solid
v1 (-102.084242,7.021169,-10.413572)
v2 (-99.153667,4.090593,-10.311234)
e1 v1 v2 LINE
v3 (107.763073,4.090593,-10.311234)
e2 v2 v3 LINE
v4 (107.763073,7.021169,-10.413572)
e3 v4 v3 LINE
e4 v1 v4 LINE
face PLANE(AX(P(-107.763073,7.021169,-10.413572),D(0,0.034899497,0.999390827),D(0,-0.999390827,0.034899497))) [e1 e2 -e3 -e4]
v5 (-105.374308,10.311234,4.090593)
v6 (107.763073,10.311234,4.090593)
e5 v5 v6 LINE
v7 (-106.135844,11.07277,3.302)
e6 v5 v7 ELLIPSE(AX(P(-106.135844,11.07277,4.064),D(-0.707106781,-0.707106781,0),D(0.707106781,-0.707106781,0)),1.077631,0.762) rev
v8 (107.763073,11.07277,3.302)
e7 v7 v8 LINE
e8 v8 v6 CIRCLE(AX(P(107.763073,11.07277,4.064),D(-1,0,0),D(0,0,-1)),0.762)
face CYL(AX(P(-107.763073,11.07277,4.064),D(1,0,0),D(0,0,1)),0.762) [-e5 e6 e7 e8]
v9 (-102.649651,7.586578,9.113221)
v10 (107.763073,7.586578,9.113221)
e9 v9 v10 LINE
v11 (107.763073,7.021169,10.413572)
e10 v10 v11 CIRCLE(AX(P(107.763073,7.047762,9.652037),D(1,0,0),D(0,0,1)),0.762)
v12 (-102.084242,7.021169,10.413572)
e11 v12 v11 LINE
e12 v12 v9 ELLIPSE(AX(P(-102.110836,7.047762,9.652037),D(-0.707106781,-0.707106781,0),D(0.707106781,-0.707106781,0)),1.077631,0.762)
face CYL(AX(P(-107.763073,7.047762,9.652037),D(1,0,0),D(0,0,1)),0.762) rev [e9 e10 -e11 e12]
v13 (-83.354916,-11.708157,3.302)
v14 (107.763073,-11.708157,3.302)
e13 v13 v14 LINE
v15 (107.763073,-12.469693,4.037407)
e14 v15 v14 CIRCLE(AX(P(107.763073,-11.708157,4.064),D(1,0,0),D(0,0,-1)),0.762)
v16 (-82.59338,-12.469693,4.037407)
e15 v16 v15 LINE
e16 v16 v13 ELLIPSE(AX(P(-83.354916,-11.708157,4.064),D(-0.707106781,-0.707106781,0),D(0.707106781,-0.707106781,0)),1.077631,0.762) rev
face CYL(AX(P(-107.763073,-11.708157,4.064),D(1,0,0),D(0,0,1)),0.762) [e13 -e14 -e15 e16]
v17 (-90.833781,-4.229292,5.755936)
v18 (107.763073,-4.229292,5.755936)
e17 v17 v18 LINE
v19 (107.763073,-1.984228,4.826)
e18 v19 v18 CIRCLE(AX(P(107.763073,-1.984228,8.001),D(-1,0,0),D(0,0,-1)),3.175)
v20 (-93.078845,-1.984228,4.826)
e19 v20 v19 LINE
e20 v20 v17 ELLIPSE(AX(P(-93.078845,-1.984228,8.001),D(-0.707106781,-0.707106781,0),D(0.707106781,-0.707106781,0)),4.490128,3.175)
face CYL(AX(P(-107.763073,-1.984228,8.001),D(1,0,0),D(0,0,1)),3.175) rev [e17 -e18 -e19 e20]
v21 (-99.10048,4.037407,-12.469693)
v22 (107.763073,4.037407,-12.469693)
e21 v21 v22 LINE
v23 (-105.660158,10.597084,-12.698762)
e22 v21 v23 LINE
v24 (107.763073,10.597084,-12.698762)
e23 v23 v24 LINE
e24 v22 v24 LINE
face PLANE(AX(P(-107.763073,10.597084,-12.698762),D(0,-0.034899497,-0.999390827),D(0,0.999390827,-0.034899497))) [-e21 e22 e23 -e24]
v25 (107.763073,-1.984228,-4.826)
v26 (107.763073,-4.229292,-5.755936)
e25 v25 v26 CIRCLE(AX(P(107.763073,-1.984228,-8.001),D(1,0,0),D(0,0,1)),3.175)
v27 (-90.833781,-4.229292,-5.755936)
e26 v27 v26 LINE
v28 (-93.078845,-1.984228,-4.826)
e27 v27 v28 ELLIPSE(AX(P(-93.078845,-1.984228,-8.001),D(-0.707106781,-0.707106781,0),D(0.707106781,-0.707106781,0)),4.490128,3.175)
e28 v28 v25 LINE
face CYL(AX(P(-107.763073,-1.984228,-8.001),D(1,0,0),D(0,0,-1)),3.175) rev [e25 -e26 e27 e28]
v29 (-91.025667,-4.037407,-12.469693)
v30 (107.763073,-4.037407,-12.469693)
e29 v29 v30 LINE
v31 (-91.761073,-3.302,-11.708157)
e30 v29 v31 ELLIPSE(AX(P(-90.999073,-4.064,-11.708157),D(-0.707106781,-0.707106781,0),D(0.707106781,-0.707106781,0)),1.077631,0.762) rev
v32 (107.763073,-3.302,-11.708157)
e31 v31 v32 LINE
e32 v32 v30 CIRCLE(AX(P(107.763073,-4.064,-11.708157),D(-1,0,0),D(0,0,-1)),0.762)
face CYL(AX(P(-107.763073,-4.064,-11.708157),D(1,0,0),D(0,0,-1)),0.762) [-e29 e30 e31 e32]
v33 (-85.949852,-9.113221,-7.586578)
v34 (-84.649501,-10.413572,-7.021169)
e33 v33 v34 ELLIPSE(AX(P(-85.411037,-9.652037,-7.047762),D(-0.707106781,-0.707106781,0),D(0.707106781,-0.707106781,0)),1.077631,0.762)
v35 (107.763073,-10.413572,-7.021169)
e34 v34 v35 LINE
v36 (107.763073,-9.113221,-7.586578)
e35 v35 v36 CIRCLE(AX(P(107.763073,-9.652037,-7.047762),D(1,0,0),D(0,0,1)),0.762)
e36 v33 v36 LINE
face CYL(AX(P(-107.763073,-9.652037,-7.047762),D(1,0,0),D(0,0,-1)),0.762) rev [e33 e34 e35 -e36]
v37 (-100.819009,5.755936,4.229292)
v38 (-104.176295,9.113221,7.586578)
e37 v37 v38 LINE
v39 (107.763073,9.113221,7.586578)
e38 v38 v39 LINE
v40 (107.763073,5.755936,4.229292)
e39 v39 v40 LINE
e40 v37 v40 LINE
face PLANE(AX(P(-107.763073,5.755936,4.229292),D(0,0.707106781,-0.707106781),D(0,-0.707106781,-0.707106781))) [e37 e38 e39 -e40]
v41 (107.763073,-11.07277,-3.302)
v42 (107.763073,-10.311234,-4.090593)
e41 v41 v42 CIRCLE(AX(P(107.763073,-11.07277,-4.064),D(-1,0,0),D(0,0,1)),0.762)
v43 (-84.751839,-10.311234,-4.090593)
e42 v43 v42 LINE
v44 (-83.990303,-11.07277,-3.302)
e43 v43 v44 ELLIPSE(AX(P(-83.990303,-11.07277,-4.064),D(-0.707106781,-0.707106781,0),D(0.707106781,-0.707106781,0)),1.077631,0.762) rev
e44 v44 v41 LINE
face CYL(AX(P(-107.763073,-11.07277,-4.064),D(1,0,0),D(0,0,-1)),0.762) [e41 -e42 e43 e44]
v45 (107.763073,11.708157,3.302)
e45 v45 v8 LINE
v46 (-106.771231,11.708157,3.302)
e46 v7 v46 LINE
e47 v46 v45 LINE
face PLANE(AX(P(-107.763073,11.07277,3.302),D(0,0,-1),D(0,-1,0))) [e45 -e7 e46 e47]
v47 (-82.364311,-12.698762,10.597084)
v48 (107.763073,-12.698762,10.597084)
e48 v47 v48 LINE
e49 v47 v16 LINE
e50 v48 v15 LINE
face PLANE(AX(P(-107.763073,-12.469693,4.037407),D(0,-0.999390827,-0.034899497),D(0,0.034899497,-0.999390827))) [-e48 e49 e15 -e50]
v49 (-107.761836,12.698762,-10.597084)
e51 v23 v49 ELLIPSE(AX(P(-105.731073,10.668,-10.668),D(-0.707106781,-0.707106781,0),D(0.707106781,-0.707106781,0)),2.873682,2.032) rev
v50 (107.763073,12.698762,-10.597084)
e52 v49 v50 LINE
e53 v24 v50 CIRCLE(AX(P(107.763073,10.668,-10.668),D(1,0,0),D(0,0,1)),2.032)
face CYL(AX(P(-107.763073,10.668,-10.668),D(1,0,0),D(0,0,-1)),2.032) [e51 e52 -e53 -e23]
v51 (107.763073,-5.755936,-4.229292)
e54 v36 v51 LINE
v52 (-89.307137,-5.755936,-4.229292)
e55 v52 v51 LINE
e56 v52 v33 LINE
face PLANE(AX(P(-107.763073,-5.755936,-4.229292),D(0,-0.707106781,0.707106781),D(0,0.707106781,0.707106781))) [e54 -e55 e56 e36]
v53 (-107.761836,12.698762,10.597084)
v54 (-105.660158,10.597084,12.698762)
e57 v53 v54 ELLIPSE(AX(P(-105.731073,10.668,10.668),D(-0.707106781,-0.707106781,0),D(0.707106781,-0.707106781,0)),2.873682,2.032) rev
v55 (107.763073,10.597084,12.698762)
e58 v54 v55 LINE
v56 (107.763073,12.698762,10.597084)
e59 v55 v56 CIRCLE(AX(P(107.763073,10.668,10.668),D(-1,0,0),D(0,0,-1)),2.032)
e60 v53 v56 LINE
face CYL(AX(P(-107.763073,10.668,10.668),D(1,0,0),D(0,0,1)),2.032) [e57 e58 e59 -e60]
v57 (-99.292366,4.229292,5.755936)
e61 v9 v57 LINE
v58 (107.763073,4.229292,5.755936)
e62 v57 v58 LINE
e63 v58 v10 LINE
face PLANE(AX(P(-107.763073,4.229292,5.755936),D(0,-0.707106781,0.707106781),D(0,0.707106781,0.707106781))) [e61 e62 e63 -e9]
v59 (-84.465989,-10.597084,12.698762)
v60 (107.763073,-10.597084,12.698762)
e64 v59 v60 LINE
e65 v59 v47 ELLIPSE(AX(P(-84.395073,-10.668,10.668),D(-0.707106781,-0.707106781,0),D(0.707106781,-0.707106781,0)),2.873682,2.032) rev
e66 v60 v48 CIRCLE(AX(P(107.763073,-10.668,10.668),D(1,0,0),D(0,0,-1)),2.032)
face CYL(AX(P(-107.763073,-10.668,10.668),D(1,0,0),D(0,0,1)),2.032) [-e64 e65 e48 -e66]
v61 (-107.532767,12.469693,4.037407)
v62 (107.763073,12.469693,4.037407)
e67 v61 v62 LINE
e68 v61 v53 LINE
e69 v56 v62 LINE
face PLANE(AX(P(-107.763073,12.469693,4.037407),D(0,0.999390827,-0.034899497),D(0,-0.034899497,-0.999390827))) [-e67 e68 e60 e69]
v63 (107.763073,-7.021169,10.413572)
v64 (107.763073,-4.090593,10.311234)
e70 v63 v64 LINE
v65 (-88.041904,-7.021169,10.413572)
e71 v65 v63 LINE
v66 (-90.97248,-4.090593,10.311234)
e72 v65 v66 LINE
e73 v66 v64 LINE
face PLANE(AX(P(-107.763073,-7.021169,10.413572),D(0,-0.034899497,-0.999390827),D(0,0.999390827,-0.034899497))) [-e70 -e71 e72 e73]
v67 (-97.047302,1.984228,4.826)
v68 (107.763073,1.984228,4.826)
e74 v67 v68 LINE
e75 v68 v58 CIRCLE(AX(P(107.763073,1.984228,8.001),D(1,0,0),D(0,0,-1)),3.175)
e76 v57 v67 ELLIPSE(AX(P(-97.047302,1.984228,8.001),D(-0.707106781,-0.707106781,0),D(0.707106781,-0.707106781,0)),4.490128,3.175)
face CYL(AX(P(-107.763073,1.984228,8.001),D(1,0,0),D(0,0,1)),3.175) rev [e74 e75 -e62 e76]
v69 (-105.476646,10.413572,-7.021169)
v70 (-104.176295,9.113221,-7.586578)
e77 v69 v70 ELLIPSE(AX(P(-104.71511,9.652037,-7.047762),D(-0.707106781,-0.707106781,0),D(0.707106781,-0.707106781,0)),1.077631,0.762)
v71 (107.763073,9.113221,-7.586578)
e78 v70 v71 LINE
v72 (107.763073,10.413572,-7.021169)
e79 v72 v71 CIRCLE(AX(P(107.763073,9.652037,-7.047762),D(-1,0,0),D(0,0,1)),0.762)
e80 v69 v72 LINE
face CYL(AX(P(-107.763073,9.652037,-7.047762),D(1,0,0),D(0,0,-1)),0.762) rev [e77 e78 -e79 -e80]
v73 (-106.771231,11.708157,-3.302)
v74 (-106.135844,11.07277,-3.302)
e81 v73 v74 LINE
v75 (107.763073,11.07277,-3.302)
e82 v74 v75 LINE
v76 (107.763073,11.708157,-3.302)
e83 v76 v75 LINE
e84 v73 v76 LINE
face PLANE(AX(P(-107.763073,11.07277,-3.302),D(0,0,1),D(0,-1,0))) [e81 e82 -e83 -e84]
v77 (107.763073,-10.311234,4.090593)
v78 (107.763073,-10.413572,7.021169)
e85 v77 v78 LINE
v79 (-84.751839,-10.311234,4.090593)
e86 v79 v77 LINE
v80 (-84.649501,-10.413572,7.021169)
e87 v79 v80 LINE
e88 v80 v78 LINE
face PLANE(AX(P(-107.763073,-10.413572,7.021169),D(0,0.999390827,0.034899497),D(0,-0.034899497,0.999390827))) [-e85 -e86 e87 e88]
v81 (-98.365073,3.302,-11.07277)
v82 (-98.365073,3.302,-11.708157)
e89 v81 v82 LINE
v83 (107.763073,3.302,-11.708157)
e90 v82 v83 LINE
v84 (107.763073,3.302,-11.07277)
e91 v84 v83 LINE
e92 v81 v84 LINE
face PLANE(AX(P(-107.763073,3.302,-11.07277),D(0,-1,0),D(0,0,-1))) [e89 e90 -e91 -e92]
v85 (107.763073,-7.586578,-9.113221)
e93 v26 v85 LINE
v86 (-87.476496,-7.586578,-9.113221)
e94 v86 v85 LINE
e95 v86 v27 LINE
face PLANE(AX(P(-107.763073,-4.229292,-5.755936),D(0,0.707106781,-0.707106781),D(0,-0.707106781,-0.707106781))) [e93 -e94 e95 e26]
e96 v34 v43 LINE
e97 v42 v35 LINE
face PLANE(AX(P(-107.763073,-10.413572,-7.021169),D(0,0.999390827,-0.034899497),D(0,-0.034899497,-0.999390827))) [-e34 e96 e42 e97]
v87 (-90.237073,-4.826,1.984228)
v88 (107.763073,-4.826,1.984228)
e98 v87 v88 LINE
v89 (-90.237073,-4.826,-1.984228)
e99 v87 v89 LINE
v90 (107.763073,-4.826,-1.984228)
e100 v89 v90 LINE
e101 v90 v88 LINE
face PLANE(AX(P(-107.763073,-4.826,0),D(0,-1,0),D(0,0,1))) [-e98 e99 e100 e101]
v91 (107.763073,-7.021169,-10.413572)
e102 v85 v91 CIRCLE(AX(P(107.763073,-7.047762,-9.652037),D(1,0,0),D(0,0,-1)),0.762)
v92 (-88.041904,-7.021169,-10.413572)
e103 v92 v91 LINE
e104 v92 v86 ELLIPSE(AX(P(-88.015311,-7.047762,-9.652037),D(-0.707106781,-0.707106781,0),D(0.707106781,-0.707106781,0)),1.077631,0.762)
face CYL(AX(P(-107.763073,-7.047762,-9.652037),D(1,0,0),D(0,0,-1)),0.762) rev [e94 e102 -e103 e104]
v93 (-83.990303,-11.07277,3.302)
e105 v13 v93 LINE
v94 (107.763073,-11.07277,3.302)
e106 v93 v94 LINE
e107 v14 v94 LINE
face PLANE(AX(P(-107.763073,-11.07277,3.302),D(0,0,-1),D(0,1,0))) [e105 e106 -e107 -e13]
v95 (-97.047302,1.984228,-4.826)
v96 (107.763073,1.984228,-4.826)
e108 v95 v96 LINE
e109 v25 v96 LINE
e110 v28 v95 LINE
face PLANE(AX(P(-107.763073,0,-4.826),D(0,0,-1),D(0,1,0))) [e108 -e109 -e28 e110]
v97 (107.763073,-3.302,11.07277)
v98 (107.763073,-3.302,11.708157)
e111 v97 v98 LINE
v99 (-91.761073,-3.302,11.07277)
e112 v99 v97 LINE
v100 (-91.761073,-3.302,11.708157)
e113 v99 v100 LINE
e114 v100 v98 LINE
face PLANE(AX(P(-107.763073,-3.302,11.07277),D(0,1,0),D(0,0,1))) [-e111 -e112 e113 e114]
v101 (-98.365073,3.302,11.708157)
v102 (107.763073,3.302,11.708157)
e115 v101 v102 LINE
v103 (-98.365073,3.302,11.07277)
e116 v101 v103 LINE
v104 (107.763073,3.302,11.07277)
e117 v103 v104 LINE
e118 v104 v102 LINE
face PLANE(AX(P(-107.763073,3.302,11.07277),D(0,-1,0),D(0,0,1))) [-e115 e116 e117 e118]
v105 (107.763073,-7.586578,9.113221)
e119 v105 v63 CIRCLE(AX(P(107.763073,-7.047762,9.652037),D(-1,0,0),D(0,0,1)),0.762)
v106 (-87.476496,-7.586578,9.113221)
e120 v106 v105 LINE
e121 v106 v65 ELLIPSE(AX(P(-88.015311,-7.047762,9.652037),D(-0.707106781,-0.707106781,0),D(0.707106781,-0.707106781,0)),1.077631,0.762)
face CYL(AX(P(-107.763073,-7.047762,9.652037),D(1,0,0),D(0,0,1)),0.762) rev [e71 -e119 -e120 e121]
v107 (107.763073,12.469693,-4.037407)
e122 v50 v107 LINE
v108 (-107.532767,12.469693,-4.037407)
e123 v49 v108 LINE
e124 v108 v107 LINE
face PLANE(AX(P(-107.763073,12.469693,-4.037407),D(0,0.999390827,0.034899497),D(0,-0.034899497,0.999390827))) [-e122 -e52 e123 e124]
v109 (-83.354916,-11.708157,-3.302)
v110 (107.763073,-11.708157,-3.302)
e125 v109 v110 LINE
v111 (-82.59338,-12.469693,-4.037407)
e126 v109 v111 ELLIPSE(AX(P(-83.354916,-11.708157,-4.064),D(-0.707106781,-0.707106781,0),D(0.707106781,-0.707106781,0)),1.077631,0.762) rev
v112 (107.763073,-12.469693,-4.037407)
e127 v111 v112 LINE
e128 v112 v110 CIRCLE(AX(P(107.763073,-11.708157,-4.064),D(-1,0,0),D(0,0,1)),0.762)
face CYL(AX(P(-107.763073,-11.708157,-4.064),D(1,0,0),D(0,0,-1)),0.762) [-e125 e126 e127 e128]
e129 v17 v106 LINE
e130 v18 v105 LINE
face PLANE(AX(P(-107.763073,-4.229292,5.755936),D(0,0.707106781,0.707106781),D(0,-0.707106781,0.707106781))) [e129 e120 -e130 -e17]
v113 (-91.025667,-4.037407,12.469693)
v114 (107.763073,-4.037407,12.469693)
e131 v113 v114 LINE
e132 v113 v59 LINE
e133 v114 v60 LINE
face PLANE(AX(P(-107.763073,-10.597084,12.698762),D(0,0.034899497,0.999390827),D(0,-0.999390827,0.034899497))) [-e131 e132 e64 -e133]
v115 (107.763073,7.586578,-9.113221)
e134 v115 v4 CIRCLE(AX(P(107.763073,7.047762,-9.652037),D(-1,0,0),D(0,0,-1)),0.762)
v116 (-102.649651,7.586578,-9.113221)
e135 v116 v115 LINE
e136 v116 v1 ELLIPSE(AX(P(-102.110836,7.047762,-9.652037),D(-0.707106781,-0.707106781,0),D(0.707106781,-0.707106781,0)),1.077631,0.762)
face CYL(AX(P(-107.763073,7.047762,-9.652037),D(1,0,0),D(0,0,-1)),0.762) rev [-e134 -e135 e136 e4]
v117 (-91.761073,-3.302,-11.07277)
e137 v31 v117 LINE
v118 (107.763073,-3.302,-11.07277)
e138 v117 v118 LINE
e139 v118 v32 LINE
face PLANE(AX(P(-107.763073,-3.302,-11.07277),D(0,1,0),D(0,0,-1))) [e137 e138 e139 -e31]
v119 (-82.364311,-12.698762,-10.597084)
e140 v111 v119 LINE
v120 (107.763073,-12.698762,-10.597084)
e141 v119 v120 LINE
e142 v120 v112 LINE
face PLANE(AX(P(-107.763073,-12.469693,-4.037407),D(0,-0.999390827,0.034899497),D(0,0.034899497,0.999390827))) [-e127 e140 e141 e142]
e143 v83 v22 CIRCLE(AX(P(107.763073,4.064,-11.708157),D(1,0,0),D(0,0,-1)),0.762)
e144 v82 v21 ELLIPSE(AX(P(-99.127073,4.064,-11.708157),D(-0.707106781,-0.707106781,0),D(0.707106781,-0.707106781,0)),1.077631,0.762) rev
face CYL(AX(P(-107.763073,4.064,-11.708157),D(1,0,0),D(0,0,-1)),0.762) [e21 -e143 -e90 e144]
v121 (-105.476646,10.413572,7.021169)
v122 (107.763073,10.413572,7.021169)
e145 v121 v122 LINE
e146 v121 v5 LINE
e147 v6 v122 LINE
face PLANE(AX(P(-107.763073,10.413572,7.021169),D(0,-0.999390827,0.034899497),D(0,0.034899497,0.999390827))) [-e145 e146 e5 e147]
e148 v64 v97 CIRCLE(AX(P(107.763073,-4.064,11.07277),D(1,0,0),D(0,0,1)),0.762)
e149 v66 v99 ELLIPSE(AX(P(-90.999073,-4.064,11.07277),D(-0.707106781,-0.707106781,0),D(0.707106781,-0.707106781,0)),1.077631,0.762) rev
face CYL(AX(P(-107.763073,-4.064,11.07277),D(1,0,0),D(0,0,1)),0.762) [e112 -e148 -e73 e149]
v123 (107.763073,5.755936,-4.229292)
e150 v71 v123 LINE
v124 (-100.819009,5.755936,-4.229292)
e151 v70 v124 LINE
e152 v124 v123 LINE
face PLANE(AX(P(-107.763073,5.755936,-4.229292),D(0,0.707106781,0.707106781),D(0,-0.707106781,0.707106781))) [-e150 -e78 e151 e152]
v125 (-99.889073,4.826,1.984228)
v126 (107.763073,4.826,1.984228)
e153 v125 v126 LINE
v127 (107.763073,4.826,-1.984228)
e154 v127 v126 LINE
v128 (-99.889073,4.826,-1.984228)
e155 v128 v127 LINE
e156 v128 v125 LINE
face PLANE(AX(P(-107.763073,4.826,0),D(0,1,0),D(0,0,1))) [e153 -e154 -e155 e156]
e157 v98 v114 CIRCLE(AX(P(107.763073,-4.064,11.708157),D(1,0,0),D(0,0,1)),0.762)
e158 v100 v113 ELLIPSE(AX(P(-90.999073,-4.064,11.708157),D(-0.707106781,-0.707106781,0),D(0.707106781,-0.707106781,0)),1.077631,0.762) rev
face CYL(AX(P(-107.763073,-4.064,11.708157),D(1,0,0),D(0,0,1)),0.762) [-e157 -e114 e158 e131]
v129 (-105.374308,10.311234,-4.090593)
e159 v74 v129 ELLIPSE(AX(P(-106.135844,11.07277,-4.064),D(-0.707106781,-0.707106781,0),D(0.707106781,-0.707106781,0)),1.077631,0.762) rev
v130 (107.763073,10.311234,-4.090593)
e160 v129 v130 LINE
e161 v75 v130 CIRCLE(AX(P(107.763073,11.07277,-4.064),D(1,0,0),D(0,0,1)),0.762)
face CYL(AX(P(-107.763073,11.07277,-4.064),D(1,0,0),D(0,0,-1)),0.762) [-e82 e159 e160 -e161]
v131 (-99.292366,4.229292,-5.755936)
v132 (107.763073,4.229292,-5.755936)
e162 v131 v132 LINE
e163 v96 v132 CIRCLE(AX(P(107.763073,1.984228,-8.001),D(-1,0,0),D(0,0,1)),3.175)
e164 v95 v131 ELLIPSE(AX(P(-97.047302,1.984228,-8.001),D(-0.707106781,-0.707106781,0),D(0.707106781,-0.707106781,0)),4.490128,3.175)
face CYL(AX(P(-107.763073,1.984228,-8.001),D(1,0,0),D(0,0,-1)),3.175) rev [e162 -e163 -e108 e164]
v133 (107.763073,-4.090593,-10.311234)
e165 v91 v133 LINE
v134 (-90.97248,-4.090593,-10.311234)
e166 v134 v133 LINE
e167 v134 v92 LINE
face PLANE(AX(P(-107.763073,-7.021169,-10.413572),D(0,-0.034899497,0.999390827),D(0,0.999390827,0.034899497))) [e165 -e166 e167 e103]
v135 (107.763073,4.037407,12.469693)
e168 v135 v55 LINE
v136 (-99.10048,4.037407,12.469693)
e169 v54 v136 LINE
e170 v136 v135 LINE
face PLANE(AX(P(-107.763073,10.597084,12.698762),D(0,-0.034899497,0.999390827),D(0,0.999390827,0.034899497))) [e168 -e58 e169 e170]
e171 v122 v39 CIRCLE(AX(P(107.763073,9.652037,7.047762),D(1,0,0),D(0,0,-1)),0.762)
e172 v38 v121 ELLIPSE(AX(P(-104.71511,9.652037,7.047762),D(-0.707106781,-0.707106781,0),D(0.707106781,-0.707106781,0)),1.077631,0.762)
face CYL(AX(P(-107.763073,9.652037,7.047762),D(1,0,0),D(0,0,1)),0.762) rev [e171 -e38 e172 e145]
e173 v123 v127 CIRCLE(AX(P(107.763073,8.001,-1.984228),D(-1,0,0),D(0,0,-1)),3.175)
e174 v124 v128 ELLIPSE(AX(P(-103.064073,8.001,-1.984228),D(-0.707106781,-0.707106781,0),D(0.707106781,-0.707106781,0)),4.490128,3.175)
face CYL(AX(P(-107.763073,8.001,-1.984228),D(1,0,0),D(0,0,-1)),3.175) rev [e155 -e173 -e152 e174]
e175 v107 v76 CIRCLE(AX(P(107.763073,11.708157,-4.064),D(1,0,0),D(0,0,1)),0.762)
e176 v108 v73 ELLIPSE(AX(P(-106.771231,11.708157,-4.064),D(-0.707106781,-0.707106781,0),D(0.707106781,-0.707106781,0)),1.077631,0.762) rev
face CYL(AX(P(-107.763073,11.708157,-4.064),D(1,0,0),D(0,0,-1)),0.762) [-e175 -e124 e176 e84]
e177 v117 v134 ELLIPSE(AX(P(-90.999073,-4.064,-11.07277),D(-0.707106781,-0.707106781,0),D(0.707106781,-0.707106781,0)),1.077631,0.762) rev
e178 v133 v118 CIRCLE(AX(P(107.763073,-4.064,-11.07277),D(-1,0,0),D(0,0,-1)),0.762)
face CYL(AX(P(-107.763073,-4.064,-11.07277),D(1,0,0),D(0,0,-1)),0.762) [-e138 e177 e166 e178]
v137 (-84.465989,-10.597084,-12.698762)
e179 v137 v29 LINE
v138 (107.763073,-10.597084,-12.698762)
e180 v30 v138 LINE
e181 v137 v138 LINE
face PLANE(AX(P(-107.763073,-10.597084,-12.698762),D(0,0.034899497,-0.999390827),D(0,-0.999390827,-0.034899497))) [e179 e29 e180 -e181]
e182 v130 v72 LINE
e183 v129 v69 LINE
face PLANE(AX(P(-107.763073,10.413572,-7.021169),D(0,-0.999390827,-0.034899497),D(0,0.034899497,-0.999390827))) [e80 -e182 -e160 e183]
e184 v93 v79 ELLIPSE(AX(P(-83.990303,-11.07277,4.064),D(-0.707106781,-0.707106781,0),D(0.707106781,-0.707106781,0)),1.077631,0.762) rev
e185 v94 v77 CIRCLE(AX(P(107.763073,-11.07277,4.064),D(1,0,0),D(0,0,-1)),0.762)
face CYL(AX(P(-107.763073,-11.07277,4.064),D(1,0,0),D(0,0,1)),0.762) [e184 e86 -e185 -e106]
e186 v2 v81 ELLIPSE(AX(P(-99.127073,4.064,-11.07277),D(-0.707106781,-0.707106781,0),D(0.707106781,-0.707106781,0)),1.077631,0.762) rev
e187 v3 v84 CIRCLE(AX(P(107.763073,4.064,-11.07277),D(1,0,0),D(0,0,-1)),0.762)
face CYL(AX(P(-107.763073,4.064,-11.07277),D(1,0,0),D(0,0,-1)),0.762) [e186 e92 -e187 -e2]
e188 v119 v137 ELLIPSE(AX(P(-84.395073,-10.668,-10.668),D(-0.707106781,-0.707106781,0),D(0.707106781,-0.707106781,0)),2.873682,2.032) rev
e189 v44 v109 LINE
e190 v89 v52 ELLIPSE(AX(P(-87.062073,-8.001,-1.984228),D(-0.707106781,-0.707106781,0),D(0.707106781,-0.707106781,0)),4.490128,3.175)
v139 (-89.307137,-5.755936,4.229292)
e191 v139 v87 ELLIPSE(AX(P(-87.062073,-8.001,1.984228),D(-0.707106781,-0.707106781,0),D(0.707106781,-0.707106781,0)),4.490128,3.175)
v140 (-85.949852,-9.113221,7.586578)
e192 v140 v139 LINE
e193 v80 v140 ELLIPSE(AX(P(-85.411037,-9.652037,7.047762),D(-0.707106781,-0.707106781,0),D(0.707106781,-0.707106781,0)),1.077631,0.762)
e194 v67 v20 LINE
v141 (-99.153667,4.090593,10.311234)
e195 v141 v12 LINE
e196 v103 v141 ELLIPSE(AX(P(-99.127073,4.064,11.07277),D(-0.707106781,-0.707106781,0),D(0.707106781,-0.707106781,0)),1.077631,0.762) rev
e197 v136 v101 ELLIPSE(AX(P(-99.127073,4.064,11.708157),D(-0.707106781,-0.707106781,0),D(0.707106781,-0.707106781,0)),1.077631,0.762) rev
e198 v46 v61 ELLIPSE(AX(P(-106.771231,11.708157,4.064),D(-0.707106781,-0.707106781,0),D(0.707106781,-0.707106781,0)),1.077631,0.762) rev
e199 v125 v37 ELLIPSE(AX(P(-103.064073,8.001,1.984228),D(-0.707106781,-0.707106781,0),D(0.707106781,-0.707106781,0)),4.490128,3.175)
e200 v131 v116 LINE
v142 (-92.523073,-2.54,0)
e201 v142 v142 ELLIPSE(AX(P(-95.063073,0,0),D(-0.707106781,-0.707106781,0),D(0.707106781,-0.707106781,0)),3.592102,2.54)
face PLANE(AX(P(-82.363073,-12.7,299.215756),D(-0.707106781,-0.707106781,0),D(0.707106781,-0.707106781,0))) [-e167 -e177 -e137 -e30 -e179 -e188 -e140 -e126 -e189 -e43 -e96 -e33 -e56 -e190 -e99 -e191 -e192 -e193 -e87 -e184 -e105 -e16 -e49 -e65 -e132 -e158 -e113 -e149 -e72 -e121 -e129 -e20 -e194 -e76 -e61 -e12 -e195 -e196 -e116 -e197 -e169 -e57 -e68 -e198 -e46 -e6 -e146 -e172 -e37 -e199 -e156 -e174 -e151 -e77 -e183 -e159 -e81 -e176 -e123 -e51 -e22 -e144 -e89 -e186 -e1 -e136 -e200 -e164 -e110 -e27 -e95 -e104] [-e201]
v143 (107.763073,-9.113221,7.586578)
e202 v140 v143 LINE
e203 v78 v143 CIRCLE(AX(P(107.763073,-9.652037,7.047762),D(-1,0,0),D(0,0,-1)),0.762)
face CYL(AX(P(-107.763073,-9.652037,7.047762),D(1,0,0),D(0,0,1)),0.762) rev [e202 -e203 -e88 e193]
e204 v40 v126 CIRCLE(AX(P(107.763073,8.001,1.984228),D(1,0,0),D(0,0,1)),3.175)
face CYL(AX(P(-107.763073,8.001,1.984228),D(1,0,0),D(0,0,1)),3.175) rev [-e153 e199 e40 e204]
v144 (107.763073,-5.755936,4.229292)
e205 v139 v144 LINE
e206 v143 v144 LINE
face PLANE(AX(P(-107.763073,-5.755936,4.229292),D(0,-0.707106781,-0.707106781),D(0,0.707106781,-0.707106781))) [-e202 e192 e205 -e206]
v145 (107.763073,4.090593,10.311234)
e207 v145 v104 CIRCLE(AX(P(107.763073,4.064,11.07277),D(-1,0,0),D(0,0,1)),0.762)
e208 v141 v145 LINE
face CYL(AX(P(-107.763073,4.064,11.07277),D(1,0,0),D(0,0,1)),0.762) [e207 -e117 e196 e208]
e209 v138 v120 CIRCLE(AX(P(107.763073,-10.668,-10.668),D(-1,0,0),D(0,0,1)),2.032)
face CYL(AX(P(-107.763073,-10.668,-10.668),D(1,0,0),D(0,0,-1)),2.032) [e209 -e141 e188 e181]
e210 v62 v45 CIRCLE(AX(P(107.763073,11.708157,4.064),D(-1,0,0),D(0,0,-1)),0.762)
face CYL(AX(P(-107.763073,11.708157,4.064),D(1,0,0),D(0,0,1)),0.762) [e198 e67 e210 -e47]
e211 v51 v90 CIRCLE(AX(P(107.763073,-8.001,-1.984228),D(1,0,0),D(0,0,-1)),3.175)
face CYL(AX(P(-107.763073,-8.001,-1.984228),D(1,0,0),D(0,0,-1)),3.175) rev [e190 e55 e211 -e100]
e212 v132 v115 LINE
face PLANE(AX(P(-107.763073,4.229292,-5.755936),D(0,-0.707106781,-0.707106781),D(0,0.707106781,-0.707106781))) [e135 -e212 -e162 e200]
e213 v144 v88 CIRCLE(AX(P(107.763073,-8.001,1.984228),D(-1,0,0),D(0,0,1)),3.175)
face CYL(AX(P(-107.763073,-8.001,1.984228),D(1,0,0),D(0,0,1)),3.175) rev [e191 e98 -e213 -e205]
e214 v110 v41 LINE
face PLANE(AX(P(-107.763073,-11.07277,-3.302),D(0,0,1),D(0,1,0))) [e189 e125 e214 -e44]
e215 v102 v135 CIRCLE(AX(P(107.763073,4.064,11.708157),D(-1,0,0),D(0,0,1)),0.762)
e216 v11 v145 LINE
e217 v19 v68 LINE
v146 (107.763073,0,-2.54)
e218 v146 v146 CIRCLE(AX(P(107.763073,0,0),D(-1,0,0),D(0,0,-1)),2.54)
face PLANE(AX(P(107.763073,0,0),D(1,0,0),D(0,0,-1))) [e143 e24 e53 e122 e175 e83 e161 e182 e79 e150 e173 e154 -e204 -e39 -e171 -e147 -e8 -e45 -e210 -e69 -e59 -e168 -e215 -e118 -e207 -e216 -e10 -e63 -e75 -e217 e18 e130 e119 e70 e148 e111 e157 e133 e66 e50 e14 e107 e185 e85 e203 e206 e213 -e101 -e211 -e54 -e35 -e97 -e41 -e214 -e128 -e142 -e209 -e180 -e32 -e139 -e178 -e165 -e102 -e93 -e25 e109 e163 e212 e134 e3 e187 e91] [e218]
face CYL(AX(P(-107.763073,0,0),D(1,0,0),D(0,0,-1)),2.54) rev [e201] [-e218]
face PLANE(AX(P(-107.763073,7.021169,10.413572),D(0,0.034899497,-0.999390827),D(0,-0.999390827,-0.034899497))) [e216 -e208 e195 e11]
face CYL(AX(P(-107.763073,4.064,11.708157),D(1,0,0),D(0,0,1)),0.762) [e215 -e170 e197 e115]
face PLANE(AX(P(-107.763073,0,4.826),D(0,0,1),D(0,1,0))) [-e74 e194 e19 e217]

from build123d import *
from OCP.BRepAlgoAPI import BRepAlgoAPI_Cut
from OCP.TopTools import TopTools_ListOfShape

# Parameters (mm, degrees)
BOSS_EXTRUDE1_DEPTH      = 107.763073
BOSS_EXTRUDE1_DEPTH_BACK = 107.763073
CUT_EXTRUDE1_DEPTH       = 112.441765159
CUT_EXTRUDE1_DEPTH_BACK  = 112.441765159


with BuildPart() as part:
    # Sketch3 → Boss-Extrude1 (new, two sides: drawn at the far end of the back side and taken through both)
    with BuildSketch(Plane(origin=(0, 0, 0), x_dir=(0, 0, -1), z_dir=(1, 0, 0)).offset(-BOSS_EXTRUDE1_DEPTH_BACK)):
        with BuildLine():
            Line((0, 4.826), (1.984228399, 4.826))
            ThreePointArc((1.984228399, 4.826), (3.199248297, 5.067682484), (4.229292429, 5.75593597))
            Line((4.229292429, 5.75593597), (7.586577723, 9.113221264))
            ThreePointArc((7.586577723, 9.113221264), (7.746562132, 9.955883421), (7.021168939, 10.413572441))
            Line((7.021168939, 10.413572441), (4.090593416, 10.311234489))
            ThreePointArc((4.090593416, 10.311234489), (3.534670322, 10.524633371), (3.302, 11.072770299))
            Line((3.302, 11.072770299), (3.302, 11.70815736))
            ThreePointArc((3.302, 11.70815736), (3.515863072, 12.237487038), (4.037406584, 12.46969317))
            Line((4.037406584, 12.46969317), (10.597084223, 12.698762161))
            ThreePointArc((10.597084223, 12.698762161), (12.104840979, 12.104840979), (12.698762161, 10.597084223))
            Line((12.698762161, 10.597084223), (12.46969317, 4.037406584))
            ThreePointArc((12.46969317, 4.037406584), (12.237487038, 3.515863072), (11.70815736, 3.302))
            Line((11.70815736, 3.302), (11.072770299, 3.302))
            ThreePointArc((11.072770299, 3.302), (10.524633371, 3.534670322), (10.311234489, 4.090593416))
            Line((10.311234489, 4.090593416), (10.413572441, 7.021168939))
            ThreePointArc((10.413572441, 7.021168939), (9.955883421, 7.746562132), (9.113221264, 7.586577723))
            Line((9.113221264, 7.586577723), (5.75593597, 4.229292429))
            ThreePointArc((5.75593597, 4.229292429), (5.067682484, 3.199248297), (4.826, 1.984228399))
            Line((4.826, 1.984228399), (4.826, 0))
            Line((4.826, 0), (2.54, 0))
            ThreePointArc((2.54, 0), (1.796051224, 1.796051224), (0, 2.54))
            Line((0, 2.54), (0, 4.826))
        make_face()
    extrude(amount=BOSS_EXTRUDE1_DEPTH + BOSS_EXTRUDE1_DEPTH_BACK)

    # Mirror1: part across plane


with BuildPart() as part_1:
    add(part.part)
    add(part.part.mirror(Plane.ZX))

    # Mirror2: part across plane


with BuildPart() as part_2:
    add(part_1.part)
    add(part_1.part.mirror(Plane.XY))


with BuildPart() as cut_extrude1_tool:
    # Sketch5 → Cut-Extrude1 (new, two sides: drawn at the far end of the back side and taken through both)
    with BuildSketch(Plane.XY.offset(12.698762161).offset(-CUT_EXTRUDE1_DEPTH_BACK)):
        Polygon((-551.798462655, -12.7), (-107.763073399, -12.7), (-82.363073399, -12.7), (-107.763073399, 12.7), (-421.743508229, 326.68043483), (-1251.009529162, 644.465856414), (-1381.064483588, 305.085421584), align=None)
    extrude(amount=CUT_EXTRUDE1_DEPTH + CUT_EXTRUDE1_DEPTH_BACK)


with BuildPart() as part_3:
    add(part_2.part)

    # Cut-Extrude1: cut by cut_extrude1_tool, with a tolerance
    cut_extrude1_stock = TopTools_ListOfShape()
    cut_extrude1_stock.Append(part_3.part.wrapped)
    cut_extrude1_tools = TopTools_ListOfShape()
    cut_extrude1_tools.Append(cut_extrude1_tool.part.wrapped)
    cut_extrude1_cut = BRepAlgoAPI_Cut()
    cut_extrude1_cut.SetArguments(cut_extrude1_stock)
    cut_extrude1_cut.SetTools(cut_extrude1_tools)
    cut_extrude1_cut.SetFuzzyValue(0.00001)
    cut_extrude1_cut.Build()
    add(Compound.cast(cut_extrude1_cut.Shape()).solids(), mode=Mode.REPLACE)


solid = part_3.part
